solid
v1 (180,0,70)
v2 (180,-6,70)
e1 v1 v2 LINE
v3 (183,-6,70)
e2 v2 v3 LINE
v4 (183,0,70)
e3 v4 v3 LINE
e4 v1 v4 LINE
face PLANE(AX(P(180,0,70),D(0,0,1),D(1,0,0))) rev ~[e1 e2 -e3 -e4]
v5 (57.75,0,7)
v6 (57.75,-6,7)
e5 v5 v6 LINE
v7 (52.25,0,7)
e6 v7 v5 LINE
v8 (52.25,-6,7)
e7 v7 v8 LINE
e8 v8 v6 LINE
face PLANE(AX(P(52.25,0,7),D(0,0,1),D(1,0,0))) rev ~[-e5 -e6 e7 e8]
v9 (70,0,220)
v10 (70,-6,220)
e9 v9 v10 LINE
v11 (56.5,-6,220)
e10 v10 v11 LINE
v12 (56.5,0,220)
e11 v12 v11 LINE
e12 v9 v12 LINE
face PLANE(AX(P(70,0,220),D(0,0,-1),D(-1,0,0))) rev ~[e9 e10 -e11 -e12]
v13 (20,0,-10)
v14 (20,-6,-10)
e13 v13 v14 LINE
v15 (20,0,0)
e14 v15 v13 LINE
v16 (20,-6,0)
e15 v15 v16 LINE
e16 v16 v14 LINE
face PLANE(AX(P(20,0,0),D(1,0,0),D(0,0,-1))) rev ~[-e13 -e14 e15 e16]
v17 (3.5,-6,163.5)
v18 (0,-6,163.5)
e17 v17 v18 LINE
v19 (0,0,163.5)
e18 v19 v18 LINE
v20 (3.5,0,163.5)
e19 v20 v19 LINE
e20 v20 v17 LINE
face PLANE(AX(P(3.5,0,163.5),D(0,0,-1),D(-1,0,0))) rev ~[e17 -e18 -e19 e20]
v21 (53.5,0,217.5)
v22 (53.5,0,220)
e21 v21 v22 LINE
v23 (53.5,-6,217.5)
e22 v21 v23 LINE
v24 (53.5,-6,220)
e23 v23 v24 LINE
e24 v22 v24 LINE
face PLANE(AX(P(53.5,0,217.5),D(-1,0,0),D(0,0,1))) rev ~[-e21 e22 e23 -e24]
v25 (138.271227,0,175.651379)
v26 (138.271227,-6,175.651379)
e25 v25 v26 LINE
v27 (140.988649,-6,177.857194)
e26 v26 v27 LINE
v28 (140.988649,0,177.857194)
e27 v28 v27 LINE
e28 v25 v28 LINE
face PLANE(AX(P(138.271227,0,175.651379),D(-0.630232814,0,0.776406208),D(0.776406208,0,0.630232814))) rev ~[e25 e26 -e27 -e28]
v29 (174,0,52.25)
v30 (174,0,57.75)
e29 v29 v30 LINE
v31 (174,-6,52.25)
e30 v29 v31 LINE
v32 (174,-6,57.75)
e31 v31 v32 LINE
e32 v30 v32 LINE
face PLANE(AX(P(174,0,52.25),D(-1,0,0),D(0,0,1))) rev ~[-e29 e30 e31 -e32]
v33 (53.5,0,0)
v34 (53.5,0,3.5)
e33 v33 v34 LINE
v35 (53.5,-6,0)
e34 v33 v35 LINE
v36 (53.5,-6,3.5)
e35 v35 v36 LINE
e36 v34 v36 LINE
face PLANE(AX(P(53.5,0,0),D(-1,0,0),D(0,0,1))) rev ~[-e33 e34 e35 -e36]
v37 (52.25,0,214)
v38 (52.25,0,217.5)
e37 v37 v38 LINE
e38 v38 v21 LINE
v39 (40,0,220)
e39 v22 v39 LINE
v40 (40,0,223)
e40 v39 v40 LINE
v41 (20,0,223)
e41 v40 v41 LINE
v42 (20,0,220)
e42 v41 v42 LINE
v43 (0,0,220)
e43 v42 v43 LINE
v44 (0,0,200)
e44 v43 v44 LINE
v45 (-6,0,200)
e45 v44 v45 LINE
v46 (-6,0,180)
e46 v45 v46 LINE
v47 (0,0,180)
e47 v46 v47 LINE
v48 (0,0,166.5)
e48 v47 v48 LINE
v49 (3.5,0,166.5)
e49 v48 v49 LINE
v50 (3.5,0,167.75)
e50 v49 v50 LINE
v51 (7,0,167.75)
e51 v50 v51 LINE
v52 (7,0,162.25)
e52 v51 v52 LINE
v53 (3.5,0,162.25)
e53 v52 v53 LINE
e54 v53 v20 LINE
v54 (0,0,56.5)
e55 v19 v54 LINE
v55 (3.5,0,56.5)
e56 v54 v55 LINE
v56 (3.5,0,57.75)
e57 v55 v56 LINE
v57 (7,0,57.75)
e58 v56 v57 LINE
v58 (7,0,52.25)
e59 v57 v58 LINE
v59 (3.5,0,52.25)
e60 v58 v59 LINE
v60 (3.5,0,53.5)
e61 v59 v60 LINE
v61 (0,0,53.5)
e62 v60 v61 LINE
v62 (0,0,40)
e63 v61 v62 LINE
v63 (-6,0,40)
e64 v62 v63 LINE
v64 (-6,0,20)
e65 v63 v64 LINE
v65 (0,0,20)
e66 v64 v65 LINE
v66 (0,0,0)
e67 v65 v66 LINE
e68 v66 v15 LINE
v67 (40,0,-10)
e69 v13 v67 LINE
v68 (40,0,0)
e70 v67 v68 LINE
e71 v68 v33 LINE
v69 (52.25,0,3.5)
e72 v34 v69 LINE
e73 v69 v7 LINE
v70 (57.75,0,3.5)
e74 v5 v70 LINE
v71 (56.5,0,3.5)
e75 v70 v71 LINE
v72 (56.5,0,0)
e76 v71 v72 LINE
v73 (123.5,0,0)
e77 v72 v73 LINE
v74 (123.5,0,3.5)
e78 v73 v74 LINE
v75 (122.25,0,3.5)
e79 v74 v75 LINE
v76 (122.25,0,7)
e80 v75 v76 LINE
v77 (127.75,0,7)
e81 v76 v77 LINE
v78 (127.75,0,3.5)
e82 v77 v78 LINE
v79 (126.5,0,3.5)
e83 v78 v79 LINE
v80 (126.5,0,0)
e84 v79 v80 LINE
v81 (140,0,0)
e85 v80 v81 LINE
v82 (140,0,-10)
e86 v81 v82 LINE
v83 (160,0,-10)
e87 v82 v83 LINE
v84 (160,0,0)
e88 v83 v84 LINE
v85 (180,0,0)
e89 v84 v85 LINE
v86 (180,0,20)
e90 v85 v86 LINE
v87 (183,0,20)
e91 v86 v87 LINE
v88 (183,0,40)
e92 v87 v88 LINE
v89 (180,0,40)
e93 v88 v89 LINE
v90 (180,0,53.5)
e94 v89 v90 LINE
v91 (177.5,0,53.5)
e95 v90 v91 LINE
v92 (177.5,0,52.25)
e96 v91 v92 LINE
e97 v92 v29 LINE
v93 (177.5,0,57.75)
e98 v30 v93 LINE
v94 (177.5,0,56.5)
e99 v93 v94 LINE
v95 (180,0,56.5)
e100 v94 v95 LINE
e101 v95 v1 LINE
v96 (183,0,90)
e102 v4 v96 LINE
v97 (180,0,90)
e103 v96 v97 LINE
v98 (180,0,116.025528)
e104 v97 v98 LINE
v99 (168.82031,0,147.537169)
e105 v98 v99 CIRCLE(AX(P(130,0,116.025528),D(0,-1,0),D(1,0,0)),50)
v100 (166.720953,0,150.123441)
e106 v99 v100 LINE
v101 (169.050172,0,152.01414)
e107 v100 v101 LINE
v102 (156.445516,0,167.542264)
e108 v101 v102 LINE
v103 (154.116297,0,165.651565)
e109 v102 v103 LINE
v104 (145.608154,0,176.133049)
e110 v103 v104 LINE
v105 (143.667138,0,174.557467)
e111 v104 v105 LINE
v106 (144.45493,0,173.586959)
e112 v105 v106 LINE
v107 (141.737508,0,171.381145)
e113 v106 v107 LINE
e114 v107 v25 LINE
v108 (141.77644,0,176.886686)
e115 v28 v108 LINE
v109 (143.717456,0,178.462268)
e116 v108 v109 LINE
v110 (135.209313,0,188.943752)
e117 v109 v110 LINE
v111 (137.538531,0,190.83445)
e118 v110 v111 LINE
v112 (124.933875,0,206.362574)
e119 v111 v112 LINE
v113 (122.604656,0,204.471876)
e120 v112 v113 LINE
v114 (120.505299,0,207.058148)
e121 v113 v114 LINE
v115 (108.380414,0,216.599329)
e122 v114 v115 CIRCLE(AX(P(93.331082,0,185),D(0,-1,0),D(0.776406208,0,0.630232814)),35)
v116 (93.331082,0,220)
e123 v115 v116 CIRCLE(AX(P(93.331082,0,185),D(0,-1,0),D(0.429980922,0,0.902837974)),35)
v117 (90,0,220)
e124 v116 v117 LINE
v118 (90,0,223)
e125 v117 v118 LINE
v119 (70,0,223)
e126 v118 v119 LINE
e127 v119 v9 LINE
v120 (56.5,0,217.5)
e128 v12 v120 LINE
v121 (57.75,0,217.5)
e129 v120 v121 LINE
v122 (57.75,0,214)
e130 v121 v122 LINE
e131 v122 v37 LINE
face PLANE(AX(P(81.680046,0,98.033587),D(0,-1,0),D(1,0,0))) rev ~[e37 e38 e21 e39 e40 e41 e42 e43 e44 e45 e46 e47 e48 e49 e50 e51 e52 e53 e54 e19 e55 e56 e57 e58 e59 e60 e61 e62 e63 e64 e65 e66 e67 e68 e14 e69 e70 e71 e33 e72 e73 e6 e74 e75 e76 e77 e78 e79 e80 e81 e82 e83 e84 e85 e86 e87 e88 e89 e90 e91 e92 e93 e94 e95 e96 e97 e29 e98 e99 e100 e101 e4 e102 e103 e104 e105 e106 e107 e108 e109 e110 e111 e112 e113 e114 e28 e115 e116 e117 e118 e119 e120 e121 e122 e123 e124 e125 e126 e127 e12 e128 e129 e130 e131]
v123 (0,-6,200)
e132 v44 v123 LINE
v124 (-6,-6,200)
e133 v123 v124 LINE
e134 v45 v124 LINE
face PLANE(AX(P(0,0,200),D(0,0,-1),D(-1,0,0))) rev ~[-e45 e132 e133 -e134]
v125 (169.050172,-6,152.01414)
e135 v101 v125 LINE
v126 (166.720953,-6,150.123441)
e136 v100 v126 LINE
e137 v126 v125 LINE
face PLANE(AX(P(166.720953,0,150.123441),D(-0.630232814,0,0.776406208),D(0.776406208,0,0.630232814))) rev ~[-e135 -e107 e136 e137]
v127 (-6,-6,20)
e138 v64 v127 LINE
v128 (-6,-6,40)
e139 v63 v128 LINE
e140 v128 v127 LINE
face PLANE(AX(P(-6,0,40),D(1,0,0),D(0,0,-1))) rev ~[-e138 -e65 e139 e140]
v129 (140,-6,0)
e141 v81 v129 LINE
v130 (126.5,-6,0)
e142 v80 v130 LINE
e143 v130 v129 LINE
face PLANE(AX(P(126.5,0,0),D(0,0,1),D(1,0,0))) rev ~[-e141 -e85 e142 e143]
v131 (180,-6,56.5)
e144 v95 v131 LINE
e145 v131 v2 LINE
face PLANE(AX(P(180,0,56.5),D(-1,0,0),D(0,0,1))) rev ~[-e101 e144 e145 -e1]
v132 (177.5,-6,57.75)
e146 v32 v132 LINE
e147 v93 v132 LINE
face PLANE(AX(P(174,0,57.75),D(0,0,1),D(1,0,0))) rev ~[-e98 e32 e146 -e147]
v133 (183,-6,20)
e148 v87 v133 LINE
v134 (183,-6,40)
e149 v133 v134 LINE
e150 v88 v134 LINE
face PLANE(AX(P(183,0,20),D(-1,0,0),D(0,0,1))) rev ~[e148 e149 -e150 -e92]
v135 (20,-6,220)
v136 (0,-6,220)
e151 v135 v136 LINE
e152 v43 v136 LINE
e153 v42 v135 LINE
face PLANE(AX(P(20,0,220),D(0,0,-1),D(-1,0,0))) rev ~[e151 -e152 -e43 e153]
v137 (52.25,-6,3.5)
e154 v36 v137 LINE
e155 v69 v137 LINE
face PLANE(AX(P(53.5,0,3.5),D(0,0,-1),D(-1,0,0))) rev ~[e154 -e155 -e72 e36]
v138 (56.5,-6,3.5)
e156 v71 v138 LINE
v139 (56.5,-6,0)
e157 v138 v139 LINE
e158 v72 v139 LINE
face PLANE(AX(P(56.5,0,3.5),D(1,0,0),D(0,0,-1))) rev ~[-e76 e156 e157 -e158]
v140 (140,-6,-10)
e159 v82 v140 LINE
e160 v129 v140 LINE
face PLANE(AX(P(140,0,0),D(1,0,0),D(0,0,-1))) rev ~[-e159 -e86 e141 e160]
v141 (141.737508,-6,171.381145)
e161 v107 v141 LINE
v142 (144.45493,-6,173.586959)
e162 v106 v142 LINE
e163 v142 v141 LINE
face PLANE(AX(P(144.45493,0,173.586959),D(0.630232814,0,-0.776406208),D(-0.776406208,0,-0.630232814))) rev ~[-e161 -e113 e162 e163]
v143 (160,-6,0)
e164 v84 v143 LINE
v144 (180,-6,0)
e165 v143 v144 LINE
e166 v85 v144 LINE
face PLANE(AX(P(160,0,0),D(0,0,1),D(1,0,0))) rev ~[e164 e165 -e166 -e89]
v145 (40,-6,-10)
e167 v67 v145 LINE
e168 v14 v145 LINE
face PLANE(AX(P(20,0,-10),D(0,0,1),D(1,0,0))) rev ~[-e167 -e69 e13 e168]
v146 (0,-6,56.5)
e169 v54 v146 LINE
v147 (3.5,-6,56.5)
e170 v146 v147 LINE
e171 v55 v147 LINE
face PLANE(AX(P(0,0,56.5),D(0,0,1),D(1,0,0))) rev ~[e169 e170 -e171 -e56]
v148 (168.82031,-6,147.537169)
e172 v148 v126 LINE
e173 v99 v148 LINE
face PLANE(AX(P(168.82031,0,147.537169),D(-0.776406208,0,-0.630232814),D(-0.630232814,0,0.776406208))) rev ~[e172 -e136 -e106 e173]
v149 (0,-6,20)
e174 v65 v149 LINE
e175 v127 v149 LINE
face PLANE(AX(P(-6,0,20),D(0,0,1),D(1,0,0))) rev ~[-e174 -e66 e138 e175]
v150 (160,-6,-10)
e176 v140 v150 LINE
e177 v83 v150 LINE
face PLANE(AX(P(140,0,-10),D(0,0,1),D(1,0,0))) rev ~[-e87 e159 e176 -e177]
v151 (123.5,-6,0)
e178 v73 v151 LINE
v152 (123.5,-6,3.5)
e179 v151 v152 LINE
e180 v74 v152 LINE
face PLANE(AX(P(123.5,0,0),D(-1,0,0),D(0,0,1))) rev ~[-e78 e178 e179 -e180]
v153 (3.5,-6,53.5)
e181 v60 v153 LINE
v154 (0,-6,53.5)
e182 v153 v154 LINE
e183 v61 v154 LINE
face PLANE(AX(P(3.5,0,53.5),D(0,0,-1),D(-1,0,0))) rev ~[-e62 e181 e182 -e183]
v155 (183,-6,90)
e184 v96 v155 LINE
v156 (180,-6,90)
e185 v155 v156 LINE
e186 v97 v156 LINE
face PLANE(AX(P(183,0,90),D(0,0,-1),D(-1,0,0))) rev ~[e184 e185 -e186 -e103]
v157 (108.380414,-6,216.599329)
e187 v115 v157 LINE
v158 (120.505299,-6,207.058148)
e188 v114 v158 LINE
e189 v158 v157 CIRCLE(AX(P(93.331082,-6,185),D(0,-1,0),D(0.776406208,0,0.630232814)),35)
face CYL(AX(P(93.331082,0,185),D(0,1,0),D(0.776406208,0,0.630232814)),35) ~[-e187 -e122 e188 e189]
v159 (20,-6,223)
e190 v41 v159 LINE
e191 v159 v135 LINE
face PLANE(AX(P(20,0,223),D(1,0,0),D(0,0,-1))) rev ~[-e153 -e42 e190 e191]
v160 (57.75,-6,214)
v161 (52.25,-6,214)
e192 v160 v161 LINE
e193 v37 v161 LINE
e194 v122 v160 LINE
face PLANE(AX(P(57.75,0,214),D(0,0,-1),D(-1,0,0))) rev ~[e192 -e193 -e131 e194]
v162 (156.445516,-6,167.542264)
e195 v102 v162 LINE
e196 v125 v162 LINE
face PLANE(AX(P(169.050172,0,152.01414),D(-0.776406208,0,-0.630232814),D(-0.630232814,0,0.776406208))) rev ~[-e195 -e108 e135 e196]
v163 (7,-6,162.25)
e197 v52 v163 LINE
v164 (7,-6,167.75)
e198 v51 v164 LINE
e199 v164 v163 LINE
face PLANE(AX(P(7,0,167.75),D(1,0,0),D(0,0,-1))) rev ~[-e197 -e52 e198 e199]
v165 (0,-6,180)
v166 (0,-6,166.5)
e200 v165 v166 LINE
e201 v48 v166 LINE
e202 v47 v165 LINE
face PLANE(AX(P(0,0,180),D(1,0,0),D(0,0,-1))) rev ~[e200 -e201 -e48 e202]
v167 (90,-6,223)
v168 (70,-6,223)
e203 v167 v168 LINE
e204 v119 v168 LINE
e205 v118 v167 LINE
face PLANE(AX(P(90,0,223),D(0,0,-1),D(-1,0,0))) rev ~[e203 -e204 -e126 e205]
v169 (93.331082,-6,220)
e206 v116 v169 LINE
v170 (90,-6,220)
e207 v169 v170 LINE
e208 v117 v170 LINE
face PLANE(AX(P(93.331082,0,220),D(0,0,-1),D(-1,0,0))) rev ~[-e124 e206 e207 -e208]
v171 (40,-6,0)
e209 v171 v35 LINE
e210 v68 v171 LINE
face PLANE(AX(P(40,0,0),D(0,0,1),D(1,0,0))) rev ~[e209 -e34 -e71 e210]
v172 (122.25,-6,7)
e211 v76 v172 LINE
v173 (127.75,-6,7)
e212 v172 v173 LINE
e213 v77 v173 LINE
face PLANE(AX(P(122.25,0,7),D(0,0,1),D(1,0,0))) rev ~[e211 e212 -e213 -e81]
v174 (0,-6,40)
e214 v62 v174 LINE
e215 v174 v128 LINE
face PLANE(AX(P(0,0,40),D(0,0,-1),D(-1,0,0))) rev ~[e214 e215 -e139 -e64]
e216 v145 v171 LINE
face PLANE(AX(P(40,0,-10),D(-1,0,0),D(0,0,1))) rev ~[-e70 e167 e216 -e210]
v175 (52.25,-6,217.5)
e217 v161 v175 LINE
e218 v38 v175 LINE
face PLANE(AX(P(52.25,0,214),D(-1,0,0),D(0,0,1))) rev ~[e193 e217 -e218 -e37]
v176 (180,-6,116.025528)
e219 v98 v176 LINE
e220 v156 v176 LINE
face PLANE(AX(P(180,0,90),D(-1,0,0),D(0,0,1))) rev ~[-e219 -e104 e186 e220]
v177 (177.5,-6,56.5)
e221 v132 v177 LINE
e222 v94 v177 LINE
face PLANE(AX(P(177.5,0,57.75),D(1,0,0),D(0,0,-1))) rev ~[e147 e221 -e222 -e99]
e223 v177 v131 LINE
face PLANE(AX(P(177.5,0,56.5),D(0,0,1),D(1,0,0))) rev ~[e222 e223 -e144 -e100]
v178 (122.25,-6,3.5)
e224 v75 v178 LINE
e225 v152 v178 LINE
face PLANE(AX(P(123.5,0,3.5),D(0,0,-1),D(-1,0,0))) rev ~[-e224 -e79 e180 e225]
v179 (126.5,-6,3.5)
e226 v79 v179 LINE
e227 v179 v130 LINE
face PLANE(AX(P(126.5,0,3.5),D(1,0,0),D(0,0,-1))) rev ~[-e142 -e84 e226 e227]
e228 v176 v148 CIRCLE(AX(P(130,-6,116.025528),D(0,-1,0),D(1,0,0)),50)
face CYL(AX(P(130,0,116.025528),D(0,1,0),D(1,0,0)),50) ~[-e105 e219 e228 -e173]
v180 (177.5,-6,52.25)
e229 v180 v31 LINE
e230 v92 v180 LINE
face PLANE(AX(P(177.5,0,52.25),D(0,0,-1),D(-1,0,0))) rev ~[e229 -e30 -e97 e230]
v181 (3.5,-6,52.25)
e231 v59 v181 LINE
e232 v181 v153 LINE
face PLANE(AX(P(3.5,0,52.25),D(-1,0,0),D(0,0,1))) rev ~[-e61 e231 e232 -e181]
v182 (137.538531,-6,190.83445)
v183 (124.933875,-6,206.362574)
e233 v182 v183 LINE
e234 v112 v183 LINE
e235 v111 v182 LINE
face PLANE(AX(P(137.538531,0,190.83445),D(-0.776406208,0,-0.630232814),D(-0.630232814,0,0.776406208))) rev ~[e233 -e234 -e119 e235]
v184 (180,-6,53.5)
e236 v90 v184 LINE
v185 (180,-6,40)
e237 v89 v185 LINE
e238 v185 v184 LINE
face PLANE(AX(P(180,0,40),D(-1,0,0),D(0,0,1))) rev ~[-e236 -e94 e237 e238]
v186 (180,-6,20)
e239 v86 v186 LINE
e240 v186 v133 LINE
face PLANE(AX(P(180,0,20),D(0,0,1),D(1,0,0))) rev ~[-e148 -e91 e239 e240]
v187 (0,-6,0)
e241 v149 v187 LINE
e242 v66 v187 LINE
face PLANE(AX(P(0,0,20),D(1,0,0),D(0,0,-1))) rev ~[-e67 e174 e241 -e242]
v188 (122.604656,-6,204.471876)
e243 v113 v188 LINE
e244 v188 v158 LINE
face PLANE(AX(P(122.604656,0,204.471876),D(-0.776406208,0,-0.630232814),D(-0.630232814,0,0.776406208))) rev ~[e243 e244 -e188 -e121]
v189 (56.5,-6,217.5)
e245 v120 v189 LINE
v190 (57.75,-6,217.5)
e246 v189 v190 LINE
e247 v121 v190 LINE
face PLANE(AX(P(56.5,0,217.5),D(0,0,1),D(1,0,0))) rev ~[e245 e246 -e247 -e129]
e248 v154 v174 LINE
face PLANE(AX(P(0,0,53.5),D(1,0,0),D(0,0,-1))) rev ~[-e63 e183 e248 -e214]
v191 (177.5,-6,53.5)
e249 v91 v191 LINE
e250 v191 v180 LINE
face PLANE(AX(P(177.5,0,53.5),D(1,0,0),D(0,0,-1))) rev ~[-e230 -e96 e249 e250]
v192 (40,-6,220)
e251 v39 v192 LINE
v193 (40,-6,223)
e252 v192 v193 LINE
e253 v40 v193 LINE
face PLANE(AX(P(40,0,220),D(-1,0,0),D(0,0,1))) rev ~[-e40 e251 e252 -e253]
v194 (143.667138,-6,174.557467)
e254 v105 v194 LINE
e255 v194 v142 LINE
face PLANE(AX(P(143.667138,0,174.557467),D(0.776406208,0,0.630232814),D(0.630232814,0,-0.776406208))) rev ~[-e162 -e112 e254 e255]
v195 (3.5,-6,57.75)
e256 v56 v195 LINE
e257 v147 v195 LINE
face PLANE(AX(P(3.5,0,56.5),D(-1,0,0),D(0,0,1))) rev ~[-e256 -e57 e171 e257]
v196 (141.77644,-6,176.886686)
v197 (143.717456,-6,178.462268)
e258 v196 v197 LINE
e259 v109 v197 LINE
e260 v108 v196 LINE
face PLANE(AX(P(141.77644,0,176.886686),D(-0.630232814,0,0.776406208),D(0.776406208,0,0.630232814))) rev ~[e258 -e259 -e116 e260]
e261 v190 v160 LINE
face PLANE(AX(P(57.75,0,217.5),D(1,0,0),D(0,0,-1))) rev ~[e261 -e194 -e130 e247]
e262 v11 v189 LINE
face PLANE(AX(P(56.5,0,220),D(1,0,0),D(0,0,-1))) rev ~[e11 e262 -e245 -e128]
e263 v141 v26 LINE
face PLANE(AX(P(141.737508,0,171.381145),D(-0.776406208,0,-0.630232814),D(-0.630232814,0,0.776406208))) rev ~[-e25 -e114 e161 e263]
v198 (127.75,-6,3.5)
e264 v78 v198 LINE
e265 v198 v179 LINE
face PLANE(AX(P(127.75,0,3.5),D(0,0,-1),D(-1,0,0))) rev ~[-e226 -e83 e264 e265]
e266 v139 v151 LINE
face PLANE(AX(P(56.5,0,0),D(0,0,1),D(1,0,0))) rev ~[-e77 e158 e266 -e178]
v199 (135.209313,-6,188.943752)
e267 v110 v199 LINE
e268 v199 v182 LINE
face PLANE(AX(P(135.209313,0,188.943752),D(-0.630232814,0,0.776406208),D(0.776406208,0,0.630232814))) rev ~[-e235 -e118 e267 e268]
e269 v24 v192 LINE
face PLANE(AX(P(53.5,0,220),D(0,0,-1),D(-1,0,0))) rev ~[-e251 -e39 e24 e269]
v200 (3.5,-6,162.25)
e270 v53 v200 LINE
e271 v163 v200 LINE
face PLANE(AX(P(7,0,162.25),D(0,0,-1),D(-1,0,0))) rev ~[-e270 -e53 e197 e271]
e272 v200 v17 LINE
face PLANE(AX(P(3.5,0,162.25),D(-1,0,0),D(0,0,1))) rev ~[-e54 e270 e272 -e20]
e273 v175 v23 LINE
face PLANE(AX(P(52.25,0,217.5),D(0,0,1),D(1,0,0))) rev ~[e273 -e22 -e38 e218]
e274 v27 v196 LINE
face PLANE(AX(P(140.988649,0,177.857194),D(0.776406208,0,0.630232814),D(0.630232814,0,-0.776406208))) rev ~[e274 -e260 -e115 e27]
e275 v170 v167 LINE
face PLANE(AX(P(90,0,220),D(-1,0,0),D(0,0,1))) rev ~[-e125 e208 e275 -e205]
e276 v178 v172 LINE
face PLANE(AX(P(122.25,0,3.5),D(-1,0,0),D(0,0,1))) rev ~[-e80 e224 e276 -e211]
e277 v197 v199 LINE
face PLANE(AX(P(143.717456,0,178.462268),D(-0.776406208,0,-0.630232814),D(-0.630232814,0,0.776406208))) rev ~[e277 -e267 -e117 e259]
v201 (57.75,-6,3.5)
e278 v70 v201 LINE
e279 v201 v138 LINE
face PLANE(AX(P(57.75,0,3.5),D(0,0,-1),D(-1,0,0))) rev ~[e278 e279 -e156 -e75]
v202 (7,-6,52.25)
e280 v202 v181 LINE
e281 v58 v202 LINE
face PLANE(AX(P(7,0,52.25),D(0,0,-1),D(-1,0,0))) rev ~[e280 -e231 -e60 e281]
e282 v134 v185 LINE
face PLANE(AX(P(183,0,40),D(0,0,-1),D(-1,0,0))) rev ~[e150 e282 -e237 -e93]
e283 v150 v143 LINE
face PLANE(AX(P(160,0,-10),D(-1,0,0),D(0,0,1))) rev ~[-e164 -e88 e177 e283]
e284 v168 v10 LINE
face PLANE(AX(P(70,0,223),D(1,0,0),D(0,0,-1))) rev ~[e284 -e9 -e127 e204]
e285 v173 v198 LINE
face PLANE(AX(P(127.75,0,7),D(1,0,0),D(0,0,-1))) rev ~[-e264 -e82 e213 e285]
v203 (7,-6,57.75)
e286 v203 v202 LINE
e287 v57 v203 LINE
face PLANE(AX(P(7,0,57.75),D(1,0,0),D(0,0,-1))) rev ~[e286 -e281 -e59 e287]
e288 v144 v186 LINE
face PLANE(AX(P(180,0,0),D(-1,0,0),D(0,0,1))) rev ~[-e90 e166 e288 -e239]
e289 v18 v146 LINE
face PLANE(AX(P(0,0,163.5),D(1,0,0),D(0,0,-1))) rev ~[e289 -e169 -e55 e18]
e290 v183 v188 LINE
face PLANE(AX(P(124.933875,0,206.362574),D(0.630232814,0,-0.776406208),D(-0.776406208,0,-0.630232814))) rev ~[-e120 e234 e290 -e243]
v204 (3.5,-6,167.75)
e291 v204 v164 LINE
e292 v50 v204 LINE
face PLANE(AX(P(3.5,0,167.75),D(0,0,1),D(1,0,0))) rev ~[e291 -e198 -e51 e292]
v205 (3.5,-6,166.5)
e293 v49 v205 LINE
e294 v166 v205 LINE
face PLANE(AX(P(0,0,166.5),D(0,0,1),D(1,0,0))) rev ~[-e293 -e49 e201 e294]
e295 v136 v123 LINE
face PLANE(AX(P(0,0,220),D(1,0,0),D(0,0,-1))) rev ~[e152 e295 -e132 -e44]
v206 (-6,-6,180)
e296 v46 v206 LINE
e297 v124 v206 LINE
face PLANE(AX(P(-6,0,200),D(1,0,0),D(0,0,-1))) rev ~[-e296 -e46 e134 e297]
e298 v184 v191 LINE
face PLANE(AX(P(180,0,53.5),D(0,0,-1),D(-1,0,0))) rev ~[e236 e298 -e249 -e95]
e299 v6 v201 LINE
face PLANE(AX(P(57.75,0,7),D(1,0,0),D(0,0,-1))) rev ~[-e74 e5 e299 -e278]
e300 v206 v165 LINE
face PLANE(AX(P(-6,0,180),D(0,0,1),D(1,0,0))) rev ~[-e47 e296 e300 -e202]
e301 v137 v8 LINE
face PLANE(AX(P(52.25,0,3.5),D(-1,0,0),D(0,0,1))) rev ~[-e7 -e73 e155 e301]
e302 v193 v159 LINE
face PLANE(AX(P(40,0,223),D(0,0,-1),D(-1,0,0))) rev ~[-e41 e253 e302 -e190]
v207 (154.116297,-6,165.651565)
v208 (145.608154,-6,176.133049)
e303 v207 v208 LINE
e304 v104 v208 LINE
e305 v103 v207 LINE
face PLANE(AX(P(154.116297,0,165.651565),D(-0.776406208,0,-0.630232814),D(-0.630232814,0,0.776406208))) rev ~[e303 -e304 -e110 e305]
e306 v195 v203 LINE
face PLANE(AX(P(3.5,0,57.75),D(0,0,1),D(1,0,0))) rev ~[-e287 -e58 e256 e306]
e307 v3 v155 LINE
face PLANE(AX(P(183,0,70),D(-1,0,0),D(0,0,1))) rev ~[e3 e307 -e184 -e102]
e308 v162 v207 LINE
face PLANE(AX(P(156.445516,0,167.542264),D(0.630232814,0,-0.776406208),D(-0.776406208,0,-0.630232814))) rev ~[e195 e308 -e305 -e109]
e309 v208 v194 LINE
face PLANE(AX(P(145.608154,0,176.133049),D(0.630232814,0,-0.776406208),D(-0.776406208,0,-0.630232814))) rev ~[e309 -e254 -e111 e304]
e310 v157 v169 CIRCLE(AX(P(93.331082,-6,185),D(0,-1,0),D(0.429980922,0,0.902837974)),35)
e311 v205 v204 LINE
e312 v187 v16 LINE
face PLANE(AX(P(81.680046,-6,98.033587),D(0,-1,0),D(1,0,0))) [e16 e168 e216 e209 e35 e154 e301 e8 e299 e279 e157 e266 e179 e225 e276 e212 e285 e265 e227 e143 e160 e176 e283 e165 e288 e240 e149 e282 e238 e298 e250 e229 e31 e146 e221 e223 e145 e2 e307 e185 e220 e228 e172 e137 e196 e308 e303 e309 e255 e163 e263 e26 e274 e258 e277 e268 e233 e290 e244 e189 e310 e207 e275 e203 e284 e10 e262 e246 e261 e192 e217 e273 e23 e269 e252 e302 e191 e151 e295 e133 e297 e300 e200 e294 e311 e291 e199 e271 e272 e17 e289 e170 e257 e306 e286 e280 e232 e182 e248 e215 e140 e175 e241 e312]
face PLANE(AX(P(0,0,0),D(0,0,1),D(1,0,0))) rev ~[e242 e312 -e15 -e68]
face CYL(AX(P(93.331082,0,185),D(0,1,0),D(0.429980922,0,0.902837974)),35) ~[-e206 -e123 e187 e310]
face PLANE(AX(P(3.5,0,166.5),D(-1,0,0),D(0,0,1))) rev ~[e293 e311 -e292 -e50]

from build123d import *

# Parameters (mm, degrees)
F1_DEPTH = 6


# Not quite as in the source:
# - a feature names something its author has since deleted; it is built from what else it names


with BuildPart() as f1:
    # F0 (on Front) → F1 (new body)
    with BuildSketch(Plane.XZ):
        with BuildLine():
            Line((20, 220), (0, 220))
            Line((0, 220), (0, 200))
            Line((0, 200), (-6, 200))
            Line((-6, 200), (-6, 180))
            Line((-6, 180), (0, 180))
            Line((0, 180), (0, 166.5))
            Line((0, 166.5), (3.5, 166.5))
            Line((3.5, 166.5), (3.5, 167.75))
            Line((3.5, 167.75), (7, 167.75))
            Line((7, 167.75), (7, 162.25))
            Line((7, 162.25), (3.5, 162.25))
            Line((3.5, 162.25), (3.5, 163.5))
            Line((3.5, 163.5), (0, 163.5))
            Line((0, 163.5), (0, 110))
            Line((0, 110), (0, 56.5))
            Line((0, 56.5), (3.5, 56.5))
            Line((3.5, 56.5), (3.5, 57.75))
            Line((3.5, 57.75), (7, 57.75))
            Line((7, 57.75), (7, 52.25))
            Line((7, 52.25), (3.5, 52.25))
            Line((3.5, 52.25), (3.5, 53.5))
            Line((3.5, 53.5), (0, 53.5))
            Line((0, 53.5), (0, 40))
            Line((0, 40), (-6, 40))
            Line((-6, 40), (-6, 20))
            Line((-6, 20), (0, 20))
            Line((0, 20), (0, 0))
            Line((0, 0), (20, 0))
            Line((20, 0), (20, -10))
            Line((20, -10), (40, -10))
            Line((40, -10), (40, 0))
            Line((40, 0), (53.5, 0))
            Line((53.5, 0), (53.5, 3.5))
            Line((53.5, 3.5), (52.25, 3.5))
            Line((52.25, 3.5), (52.25, 7))
            Line((52.25, 7), (57.75, 7))
            Line((57.75, 7), (57.75, 3.5))
            Line((57.75, 3.5), (56.5, 3.5))
            Line((56.5, 3.5), (56.5, 0))
            Line((56.5, 0), (90, 0))
            Line((90, 0), (123.5, 0))
            Line((123.5, 0), (123.5, 3.5))
            Line((123.5, 3.5), (122.25, 3.5))
            Line((122.25, 3.5), (122.25, 7))
            Line((122.25, 7), (127.75, 7))
            Line((127.75, 7), (127.75, 3.5))
            Line((127.75, 3.5), (126.5, 3.5))
            Line((126.5, 3.5), (126.5, 0))
            Line((126.5, 0), (140, 0))
            Line((140, 0), (140, -10))
            Line((140, -10), (160, -10))
            Line((160, -10), (160, 0))
            Line((160, 0), (180, 0))
            Line((180, 0), (180, 20))
            Line((180, 20), (183, 20))
            Line((183, 20), (183, 40))
            Line((183, 40), (180, 40))
            Line((180, 40), (180, 53.5))
            Line((180, 53.5), (177.5, 53.5))
            Line((177.5, 53.5), (177.5, 52.25))
            Line((177.5, 52.25), (174, 52.25))
            Line((174, 52.25), (174, 57.75))
            Line((174, 57.75), (177.5, 57.75))
            Line((177.5, 57.75), (177.5, 56.5))
            Line((177.5, 56.5), (180, 56.5))
            Line((180, 56.5), (180, 70))
            Line((180, 70), (183, 70))
            Line((183, 70), (183, 90))
            Line((183, 90), (180, 90))
            Line((180, 90), (180, 110))
            Line((180, 110), (180, 116.0255279073))
            ThreePointArc((180, 116.0255279073), (177.1222639523, 132.7435493216), (168.8203103996, 147.5371686211))
            Line((168.8203103996, 147.5371686211), (166.7209532849, 150.1234412807))
            Line((166.7209532849, 150.1234412807), (169.0501719088, 152.0141397235))
            Line((169.0501719088, 152.0141397235), (156.4455156233, 167.5422638833))
            Line((156.4455156233, 167.5422638833), (154.1162969993, 165.6515654405))
            Line((154.1162969993, 165.6515654405), (145.6081540066, 176.1330492484))
            Line((145.6081540066, 176.1330492484), (143.6671384866, 174.5574672127))
            Line((143.6671384866, 174.5574672127), (144.4549295045, 173.5869594527))
            Line((144.4549295045, 173.5869594527), (141.7375077765, 171.3811446028))
            Line((141.7375077765, 171.3811446028), (138.271227298, 175.6513787467))
            Line((138.271227298, 175.6513787467), (140.988649026, 177.8571935967))
            Line((140.988649026, 177.8571935967), (141.7764400438, 176.8866858367))
            Line((141.7764400438, 176.8866858367), (143.7174555638, 178.4622678724))
            Line((143.7174555638, 178.4622678724), (135.2093125711, 188.9437516803))
            Line((135.2093125711, 188.9437516803), (137.538531195, 190.8344501231))
            Line((137.538531195, 190.8344501231), (124.9338749095, 206.362574283))
            Line((124.9338749095, 206.362574283), (122.6046562855, 204.4718758401))
            Line((122.6046562855, 204.4718758401), (120.5052991708, 207.0581484997))
            ThreePointArc((120.5052991708, 207.0581484997), (114.9751472562, 212.5051710496), (108.3804141438, 216.5993290869))
            ThreePointArc((108.3804141438, 216.5993290869), (101.0454672184, 219.1392480735), (93.331081891, 220))
            Line((93.331081891, 220), (90, 220))
            Line((90, 220), (90, 223))
            Line((90, 223), (70, 223))
            Line((70, 223), (70, 220))
            Line((70, 220), (56.5, 220))
            Line((56.5, 220), (56.5, 217.5))
            Line((56.5, 217.5), (57.75, 217.5))
            Line((57.75, 217.5), (57.75, 214))
            Line((57.75, 214), (52.25, 214))
            Line((52.25, 214), (52.25, 217.5))
            Line((52.25, 217.5), (53.5, 217.5))
            Line((53.5, 217.5), (53.5, 220))
            Line((53.5, 220), (40, 220))
            Line((40, 220), (40, 223))
            Line((40, 223), (20, 223))
            Line((20, 223), (20, 220))
        make_face()
    extrude(amount=F1_DEPTH)


solid = f1.part
